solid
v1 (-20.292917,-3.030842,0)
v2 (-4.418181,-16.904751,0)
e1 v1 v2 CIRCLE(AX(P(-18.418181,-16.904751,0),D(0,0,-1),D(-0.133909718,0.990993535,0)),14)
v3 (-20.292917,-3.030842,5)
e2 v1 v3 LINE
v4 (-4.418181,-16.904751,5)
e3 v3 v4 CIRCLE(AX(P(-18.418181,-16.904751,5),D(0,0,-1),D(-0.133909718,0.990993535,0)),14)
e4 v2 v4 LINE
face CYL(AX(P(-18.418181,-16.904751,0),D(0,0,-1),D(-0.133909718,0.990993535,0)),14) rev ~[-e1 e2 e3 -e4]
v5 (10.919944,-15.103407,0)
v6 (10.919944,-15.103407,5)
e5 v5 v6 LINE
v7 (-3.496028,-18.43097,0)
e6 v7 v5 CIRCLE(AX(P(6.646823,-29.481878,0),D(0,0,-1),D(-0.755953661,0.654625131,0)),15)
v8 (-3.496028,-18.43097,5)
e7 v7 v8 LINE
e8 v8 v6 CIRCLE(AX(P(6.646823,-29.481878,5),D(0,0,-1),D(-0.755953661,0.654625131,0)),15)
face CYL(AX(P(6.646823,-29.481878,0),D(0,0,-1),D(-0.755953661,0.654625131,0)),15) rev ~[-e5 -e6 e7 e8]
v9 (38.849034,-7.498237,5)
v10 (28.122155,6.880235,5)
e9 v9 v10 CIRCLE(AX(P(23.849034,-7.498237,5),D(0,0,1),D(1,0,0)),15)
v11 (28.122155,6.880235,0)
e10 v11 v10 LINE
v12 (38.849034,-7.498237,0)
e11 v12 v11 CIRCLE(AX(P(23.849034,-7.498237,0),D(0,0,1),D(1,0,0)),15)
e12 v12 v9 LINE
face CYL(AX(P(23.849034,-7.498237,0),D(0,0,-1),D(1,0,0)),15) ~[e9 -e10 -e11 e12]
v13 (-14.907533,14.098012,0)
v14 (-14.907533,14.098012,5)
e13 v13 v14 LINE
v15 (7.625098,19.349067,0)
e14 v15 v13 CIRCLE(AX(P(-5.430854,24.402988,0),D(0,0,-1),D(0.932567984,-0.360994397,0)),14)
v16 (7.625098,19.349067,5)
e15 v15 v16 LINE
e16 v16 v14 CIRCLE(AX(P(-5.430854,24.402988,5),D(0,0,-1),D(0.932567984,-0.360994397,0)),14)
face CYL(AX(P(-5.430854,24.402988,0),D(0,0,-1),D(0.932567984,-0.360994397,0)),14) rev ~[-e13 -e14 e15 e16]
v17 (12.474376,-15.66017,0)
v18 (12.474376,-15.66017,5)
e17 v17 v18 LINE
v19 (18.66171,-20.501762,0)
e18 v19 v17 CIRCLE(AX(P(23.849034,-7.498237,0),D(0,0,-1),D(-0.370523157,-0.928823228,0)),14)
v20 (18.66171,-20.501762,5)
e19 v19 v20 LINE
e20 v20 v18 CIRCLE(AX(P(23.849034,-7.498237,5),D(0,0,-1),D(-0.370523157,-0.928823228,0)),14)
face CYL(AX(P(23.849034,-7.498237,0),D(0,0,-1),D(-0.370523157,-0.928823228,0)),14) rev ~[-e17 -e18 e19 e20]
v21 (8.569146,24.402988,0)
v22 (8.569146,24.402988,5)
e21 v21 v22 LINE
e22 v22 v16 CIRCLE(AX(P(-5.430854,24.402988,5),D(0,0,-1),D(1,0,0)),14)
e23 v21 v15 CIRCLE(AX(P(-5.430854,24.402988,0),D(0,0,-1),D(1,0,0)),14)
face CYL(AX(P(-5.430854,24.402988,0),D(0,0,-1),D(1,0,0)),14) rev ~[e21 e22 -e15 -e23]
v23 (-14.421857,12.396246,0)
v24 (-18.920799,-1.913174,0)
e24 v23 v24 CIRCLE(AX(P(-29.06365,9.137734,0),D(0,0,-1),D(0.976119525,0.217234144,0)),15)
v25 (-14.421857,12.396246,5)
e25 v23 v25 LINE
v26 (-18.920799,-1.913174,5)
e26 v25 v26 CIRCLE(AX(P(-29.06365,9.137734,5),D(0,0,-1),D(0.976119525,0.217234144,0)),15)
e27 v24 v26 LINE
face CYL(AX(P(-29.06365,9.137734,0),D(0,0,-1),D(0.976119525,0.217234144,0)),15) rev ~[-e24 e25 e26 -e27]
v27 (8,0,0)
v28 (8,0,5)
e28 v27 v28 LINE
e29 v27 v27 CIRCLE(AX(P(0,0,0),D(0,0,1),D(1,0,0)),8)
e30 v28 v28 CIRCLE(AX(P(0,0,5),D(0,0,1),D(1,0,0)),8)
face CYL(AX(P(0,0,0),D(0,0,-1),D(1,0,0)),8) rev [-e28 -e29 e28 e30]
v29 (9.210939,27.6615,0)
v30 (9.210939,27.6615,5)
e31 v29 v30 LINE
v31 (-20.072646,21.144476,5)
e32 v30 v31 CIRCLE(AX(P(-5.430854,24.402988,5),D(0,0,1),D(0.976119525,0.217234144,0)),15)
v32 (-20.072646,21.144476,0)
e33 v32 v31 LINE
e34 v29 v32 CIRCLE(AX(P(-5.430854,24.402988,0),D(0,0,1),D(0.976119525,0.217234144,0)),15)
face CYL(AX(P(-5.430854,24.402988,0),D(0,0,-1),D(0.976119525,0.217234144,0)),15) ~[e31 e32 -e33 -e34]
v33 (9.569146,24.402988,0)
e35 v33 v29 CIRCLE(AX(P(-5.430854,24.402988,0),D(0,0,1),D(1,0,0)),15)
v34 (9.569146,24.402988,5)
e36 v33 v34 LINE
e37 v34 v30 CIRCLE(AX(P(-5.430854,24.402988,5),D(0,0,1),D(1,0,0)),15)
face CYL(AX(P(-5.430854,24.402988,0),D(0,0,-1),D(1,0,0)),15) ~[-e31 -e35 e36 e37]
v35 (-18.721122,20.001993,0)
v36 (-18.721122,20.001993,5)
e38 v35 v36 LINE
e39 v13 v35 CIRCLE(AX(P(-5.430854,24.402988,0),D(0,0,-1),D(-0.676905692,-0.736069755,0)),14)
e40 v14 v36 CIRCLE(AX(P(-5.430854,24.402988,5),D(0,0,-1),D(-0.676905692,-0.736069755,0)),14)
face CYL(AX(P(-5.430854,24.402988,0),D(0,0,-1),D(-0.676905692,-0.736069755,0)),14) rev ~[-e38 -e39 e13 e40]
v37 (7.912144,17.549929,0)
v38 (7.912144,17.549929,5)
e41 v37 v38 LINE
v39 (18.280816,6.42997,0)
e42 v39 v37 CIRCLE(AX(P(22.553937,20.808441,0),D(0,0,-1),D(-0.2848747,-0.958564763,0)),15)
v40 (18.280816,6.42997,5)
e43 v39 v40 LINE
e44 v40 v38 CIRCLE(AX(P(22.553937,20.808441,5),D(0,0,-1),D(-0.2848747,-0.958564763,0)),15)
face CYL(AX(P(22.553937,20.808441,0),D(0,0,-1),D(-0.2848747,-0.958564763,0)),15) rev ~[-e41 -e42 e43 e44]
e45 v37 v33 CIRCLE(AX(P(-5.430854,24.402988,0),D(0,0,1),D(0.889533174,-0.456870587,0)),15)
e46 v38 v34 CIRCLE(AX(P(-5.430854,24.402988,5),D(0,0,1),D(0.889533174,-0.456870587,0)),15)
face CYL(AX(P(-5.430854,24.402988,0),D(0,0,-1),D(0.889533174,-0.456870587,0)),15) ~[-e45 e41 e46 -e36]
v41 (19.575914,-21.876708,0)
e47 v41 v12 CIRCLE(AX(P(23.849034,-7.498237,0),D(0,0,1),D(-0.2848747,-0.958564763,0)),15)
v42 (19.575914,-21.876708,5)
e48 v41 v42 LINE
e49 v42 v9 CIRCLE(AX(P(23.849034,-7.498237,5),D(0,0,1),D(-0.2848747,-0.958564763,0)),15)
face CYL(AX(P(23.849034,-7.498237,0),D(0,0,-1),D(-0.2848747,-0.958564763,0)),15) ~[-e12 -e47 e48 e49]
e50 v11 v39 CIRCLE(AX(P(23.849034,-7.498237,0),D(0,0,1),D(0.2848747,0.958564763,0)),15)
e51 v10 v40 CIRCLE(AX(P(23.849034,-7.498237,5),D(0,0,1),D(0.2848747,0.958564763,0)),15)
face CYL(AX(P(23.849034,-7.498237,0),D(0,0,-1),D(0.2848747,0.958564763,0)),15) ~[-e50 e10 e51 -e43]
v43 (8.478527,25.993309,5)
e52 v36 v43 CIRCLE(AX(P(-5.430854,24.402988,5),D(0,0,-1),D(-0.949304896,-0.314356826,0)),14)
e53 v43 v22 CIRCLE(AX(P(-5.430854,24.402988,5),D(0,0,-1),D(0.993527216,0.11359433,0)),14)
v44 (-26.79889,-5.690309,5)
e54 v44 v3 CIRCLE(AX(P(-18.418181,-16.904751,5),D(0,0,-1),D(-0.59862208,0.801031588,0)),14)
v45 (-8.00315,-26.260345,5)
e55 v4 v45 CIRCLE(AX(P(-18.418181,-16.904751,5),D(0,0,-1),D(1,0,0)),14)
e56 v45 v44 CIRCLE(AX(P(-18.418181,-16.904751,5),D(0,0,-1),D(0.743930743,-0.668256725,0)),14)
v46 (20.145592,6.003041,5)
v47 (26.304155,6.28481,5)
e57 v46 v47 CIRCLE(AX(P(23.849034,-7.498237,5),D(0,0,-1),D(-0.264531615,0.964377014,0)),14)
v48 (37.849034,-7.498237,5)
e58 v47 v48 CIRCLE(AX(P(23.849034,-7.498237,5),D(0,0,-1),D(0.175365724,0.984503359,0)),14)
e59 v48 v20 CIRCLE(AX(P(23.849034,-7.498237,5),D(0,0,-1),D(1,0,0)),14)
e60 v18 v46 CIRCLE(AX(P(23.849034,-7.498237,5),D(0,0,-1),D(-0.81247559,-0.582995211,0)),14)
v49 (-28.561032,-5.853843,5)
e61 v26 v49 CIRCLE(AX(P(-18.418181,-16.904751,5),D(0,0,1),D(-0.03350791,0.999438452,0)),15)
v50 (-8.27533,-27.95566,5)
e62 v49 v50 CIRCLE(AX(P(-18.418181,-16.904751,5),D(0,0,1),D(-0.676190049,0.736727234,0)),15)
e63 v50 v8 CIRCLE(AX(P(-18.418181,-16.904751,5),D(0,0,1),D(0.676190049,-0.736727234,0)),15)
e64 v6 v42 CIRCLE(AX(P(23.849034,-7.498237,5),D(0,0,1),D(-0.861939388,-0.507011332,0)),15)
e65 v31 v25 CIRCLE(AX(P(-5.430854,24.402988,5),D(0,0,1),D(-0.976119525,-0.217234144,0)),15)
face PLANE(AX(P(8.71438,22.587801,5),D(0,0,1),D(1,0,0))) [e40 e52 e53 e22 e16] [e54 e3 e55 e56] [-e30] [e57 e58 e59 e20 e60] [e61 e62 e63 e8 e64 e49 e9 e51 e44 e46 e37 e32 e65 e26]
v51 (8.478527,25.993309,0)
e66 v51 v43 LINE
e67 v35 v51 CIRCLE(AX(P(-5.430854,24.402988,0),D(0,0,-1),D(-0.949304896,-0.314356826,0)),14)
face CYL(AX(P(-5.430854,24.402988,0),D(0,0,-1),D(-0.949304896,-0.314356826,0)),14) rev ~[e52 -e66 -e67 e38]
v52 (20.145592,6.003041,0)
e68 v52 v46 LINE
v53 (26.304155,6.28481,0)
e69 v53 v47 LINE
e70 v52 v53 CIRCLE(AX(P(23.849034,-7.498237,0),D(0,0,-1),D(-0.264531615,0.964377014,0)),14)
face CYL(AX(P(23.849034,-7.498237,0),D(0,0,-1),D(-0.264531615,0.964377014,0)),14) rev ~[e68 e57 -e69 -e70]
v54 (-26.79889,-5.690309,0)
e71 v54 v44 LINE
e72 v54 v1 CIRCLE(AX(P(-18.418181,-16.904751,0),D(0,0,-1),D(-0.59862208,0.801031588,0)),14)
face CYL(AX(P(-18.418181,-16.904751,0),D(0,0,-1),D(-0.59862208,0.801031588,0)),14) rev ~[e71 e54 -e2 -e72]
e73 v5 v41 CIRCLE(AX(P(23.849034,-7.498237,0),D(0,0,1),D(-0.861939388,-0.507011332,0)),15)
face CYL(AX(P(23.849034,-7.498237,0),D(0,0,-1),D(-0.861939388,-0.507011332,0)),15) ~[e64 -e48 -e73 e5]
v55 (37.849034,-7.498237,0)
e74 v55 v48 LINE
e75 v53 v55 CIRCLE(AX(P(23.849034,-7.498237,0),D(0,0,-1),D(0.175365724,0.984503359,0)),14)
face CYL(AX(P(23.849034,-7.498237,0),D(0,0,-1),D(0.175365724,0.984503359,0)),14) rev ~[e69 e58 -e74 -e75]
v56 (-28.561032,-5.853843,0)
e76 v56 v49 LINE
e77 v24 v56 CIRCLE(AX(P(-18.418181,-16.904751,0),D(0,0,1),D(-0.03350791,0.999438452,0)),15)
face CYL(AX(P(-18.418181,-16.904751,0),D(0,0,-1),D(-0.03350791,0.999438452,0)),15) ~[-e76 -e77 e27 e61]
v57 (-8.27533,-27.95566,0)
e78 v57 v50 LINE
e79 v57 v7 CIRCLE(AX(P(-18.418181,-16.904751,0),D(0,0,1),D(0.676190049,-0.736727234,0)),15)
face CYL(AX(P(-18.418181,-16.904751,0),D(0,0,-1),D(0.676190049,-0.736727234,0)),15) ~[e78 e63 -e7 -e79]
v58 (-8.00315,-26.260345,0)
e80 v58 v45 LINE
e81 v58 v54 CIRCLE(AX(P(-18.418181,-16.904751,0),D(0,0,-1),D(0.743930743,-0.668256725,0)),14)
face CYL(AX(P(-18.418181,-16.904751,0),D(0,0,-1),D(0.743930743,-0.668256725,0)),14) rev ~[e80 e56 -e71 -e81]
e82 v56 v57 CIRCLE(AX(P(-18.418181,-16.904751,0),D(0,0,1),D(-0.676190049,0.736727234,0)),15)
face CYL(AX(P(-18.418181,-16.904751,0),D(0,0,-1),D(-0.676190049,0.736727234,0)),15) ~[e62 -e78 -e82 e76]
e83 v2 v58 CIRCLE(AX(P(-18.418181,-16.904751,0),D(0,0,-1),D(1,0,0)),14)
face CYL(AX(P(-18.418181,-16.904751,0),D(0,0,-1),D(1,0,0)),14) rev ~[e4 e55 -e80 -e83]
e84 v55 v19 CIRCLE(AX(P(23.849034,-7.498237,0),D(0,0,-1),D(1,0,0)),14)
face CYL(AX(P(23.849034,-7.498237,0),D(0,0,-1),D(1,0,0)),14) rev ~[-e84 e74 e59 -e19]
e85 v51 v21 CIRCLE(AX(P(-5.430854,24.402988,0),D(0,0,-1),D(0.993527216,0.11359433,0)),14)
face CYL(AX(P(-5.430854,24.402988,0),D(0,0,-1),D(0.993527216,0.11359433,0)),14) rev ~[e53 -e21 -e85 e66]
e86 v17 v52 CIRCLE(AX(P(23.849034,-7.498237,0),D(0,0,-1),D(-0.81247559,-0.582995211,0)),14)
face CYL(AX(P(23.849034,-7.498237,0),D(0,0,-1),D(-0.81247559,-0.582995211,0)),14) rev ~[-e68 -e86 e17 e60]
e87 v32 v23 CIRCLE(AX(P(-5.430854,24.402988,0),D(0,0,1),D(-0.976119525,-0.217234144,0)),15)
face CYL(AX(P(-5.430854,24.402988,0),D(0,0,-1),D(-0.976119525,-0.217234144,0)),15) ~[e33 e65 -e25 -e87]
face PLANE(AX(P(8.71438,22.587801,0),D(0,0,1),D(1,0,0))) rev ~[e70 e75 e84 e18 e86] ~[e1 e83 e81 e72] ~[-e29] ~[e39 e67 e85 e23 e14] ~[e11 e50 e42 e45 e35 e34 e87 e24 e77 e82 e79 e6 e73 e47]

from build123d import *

# Parameters (mm, degrees)
F0_R     = 8
F1_DEPTH = 5


# Not quite as in the source:
# - a feature names something its author has since deleted; it is built from what else it names


with BuildPart() as f1:
    # F0 (on Top) → F1 (new body)
    with BuildSketch(Plane.XY):
        with BuildLine():
            ThreePointArc((7.9121440123, 17.5499293192), (9.1490120469, 20.8777196251), (9.5691464087, 24.4029881218))
            ThreePointArc((9.5691464087, 24.4029881218), (9.4793257017, 26.042059033), (9.2109392818, 27.6615002765))
            ThreePointArc((9.2109392818, 27.6615002765), (8.8193827537, 26.8385345747), (8.4785274274, 25.9933087425))
            ThreePointArc((8.4785274274, 25.9933087425), (8.5464733038, 25.1994382891), (8.5691464087, 24.4029881218))
            ThreePointArc((8.5691464087, 24.4029881218), (8.3311107472, 21.8323194251), (7.6250981876, 19.3490665605))
            ThreePointArc((7.6250981876, 19.3490665605), (7.7412805882, 18.4451358603), (7.9121440123, 17.5499293192))
        make_face()
        with BuildLine():
            ThreePointArc((8.4785274274, 25.9933087425), (8.8193827537, 26.8385345747), (9.2109392818, 27.6615002765))
            ThreePointArc((9.2109392818, 27.6615002765), (-8.689365746, 39.0447809948), (-20.0726464643, 21.144475967))
            ThreePointArc((-20.0726464643, 21.144475967), (-19.3800207125, 20.593183388), (-18.7211221359, 20.0019925512))
            ThreePointArc((-18.7211221359, 20.0019925512), (-8.442463209, 38.0752303486), (8.4785274274, 25.9933087425))
        make_face()
        with BuildLine():
            ThreePointArc((18.2808163885, 6.4299700246), (11.5832094425, 10.578918544), (7.9121440123, 17.5499293192))
            ThreePointArc((7.9121440123, 17.5499293192), (-2.0581580843, 9.7870747046), (-14.4218573571, 12.3962462122))
            ThreePointArc((-14.4218573571, 12.3962462122), (-14.7542295678, 4.6387919255), (-18.9207994891, -1.9131744502))
            ThreePointArc((-18.9207994891, -1.9131744502), (-7.9907957387, -6.1219111722), (-3.4181808461, -16.9047512351))
            ThreePointArc((-3.4181808461, -16.9047512351), (-3.4376551817, -17.6688525497), (-3.4960276219, -18.4309698155))
            ThreePointArc((-3.4960276219, -18.4309698155), (3.2731601147, -14.8661881946), (10.919943616, -15.1034068738))
            ThreePointArc((10.919943616, -15.1034068738), (9.655402449, -2.646349524), (18.2808163885, 6.4299700246))
        make_face()
        Circle(F0_R, mode=Mode.SUBTRACT)
        with BuildLine():
            ThreePointArc((-14.4218573571, 12.3962462122), (-2.0581580843, 9.7870747046), (7.9121440123, 17.5499293192))
            ThreePointArc((7.9121440123, 17.5499293192), (7.7412805882, 18.4451358603), (7.6250981876, 19.3490665605))
            ThreePointArc((7.6250981876, 19.3490665605), (-2.2534030631, 10.7683334455), (-14.907533277, 14.0980115505))
            ThreePointArc((-14.907533277, 14.0980115505), (-14.6395764677, 13.2542976843), (-14.4218573571, 12.3962462122))
        make_face()
        with BuildLine():
            ThreePointArc((-18.7211221359, 20.0019925512), (-19.3800207125, 20.593183388), (-20.0726464643, 21.144475967))
            ThreePointArc((-20.0726464643, 21.144475967), (-18.0308595518, 16.2642013697), (-14.4218573571, 12.3962462122))
            ThreePointArc((-14.4218573571, 12.3962462122), (-14.6395764677, 13.2542976843), (-14.907533277, 14.0980115505))
            ThreePointArc((-14.907533277, 14.0980115505), (-17.1908591544, 16.8067871532), (-18.7211221359, 20.0019925512))
        make_face()
        with BuildLine():
            ThreePointArc((20.1455918313, 6.0030413071), (19.2063911412, 6.1867474035), (18.2808163885, 6.4299700246))
            ThreePointArc((18.2808163885, 6.4299700246), (9.655402449, -2.646349524), (10.919943616, -15.1034068738))
            ThreePointArc((10.919943616, -15.1034068738), (11.7048264649, -15.3603839917), (12.474376183, -15.6601698438))
            ThreePointArc((12.474376183, -15.6601698438), (10.6520286886, -2.8250110982), (20.1455918313, 6.0030413071))
        make_face()
        with BuildLine():
            ThreePointArc((28.1221549341, 6.8802345627), (23.1634660922, 7.4860881247), (18.2808163885, 6.4299700246))
            ThreePointArc((18.2808163885, 6.4299700246), (19.2063911412, 6.1867474035), (20.1455918313, 6.0030413071))
            ThreePointArc((20.1455918313, 6.0030413071), (23.2091706485, 6.4871331239), (26.3041545683, 6.2848101329))
            ThreePointArc((26.3041545683, 6.2848101329), (27.2226565904, 6.5535105265), (28.1221549341, 6.8802345627))
        make_face()
        with BuildLine():
            ThreePointArc((-20.2929169032, -3.0308417387), (-19.5903609061, -2.4922611868), (-18.9207994891, -1.9131744502))
            ThreePointArc((-18.9207994891, -1.9131744502), (-24.0938941246, -3.0200013713), (-28.5610315871, -5.8538427275))
            ThreePointArc((-28.5610315871, -5.8538427275), (-27.6775469435, -5.7980858959), (-26.7988899679, -5.6903090014))
            ThreePointArc((-26.7988899679, -5.6903090014), (-23.7155132394, -3.9456513623), (-20.2929169032, -3.0308417387))
        make_face()
        with BuildLine():
            ThreePointArc((-3.4181808461, -16.9047512351), (-7.9907957387, -6.1219111722), (-18.9207994891, -1.9131744502))
            ThreePointArc((-18.9207994891, -1.9131744502), (-19.5903609061, -2.4922611868), (-20.2929169032, -3.0308417387))
            ThreePointArc((-20.2929169032, -3.0308417387), (-9.2053176863, -6.3632545482), (-4.4181808461, -16.9047512351))
            ThreePointArc((-4.4181808461, -16.9047512351), (-4.4869248616, -18.2904303809), (-4.6924818025, -19.6625013626))
            ThreePointArc((-4.6924818025, -19.6625013626), (-4.1118905803, -19.0296020384), (-3.4960276219, -18.4309698155))
            ThreePointArc((-3.4960276219, -18.4309698155), (-3.4376551817, -17.6688525497), (-3.4181808461, -16.9047512351))
        make_face()
        with BuildLine():
            ThreePointArc((38.8490344373, -7.4982368866), (35.8718628785, 1.471244496), (28.1221549341, 6.8802345627))
            ThreePointArc((28.1221549341, 6.8802345627), (27.2226565904, 6.5535105265), (26.3041545683, 6.2848101329))
            ThreePointArc((26.3041545683, 6.2848101329), (34.5815011117, 1.4914326892), (37.8490344373, -7.4982368866))
            ThreePointArc((37.8490344373, -7.4982368866), (31.7032518121, -19.0875107823), (18.6617102331, -20.5017620856))
            ThreePointArc((18.6617102331, -20.5017620856), (19.1377449469, -21.1766467253), (19.5759139405, -21.876708336))
            ThreePointArc((19.5759139405, -21.876708336), (32.81851582, -19.5210653278), (38.8490344373, -7.4982368866))
        make_face()
        with BuildLine():
            ThreePointArc((12.474376183, -15.6601698438), (11.7048264649, -15.3603839917), (10.919943616, -15.1034068738))
            ThreePointArc((10.919943616, -15.1034068738), (14.6052028869, -19.311431978), (19.5759139405, -21.876708336))
            ThreePointArc((19.5759139405, -21.876708336), (19.1377449469, -21.1766467253), (18.6617102331, -20.5017620856))
            ThreePointArc((18.6617102331, -20.5017620856), (15.2214583236, -18.5238856386), (12.474376183, -15.6601698438))
        make_face()
        with BuildLine():
            ThreePointArc((-26.7988899679, -5.6903090014), (-27.6775469435, -5.7980858959), (-28.5610315871, -5.8538427275))
            ThreePointArc((-28.5610315871, -5.8538427275), (-29.4690893537, -27.0476019762), (-8.275330105, -27.9556597428))
            ThreePointArc((-8.275330105, -27.9556597428), (-8.1635176407, -27.1041048739), (-8.003150447, -26.2603453792))
            ThreePointArc((-8.003150447, -26.2603453792), (-28.7533738733, -26.348467934), (-26.7988899679, -5.6903090014))
        make_face()
        with BuildLine():
            ThreePointArc((-8.275330105, -27.9556597428), (-5.0113342557, -23.6320437442), (-3.4960276219, -18.4309698155))
            ThreePointArc((-3.4960276219, -18.4309698155), (-4.1118905803, -19.0296020384), (-4.6924818025, -19.6625013626))
            ThreePointArc((-4.6924818025, -19.6625013626), (-5.9051240284, -23.183557577), (-8.003150447, -26.2603453792))
            ThreePointArc((-8.003150447, -26.2603453792), (-8.1635176407, -27.1041048739), (-8.275330105, -27.9556597428))
        make_face()
    extrude(amount=F1_DEPTH)


solid = f1.part
